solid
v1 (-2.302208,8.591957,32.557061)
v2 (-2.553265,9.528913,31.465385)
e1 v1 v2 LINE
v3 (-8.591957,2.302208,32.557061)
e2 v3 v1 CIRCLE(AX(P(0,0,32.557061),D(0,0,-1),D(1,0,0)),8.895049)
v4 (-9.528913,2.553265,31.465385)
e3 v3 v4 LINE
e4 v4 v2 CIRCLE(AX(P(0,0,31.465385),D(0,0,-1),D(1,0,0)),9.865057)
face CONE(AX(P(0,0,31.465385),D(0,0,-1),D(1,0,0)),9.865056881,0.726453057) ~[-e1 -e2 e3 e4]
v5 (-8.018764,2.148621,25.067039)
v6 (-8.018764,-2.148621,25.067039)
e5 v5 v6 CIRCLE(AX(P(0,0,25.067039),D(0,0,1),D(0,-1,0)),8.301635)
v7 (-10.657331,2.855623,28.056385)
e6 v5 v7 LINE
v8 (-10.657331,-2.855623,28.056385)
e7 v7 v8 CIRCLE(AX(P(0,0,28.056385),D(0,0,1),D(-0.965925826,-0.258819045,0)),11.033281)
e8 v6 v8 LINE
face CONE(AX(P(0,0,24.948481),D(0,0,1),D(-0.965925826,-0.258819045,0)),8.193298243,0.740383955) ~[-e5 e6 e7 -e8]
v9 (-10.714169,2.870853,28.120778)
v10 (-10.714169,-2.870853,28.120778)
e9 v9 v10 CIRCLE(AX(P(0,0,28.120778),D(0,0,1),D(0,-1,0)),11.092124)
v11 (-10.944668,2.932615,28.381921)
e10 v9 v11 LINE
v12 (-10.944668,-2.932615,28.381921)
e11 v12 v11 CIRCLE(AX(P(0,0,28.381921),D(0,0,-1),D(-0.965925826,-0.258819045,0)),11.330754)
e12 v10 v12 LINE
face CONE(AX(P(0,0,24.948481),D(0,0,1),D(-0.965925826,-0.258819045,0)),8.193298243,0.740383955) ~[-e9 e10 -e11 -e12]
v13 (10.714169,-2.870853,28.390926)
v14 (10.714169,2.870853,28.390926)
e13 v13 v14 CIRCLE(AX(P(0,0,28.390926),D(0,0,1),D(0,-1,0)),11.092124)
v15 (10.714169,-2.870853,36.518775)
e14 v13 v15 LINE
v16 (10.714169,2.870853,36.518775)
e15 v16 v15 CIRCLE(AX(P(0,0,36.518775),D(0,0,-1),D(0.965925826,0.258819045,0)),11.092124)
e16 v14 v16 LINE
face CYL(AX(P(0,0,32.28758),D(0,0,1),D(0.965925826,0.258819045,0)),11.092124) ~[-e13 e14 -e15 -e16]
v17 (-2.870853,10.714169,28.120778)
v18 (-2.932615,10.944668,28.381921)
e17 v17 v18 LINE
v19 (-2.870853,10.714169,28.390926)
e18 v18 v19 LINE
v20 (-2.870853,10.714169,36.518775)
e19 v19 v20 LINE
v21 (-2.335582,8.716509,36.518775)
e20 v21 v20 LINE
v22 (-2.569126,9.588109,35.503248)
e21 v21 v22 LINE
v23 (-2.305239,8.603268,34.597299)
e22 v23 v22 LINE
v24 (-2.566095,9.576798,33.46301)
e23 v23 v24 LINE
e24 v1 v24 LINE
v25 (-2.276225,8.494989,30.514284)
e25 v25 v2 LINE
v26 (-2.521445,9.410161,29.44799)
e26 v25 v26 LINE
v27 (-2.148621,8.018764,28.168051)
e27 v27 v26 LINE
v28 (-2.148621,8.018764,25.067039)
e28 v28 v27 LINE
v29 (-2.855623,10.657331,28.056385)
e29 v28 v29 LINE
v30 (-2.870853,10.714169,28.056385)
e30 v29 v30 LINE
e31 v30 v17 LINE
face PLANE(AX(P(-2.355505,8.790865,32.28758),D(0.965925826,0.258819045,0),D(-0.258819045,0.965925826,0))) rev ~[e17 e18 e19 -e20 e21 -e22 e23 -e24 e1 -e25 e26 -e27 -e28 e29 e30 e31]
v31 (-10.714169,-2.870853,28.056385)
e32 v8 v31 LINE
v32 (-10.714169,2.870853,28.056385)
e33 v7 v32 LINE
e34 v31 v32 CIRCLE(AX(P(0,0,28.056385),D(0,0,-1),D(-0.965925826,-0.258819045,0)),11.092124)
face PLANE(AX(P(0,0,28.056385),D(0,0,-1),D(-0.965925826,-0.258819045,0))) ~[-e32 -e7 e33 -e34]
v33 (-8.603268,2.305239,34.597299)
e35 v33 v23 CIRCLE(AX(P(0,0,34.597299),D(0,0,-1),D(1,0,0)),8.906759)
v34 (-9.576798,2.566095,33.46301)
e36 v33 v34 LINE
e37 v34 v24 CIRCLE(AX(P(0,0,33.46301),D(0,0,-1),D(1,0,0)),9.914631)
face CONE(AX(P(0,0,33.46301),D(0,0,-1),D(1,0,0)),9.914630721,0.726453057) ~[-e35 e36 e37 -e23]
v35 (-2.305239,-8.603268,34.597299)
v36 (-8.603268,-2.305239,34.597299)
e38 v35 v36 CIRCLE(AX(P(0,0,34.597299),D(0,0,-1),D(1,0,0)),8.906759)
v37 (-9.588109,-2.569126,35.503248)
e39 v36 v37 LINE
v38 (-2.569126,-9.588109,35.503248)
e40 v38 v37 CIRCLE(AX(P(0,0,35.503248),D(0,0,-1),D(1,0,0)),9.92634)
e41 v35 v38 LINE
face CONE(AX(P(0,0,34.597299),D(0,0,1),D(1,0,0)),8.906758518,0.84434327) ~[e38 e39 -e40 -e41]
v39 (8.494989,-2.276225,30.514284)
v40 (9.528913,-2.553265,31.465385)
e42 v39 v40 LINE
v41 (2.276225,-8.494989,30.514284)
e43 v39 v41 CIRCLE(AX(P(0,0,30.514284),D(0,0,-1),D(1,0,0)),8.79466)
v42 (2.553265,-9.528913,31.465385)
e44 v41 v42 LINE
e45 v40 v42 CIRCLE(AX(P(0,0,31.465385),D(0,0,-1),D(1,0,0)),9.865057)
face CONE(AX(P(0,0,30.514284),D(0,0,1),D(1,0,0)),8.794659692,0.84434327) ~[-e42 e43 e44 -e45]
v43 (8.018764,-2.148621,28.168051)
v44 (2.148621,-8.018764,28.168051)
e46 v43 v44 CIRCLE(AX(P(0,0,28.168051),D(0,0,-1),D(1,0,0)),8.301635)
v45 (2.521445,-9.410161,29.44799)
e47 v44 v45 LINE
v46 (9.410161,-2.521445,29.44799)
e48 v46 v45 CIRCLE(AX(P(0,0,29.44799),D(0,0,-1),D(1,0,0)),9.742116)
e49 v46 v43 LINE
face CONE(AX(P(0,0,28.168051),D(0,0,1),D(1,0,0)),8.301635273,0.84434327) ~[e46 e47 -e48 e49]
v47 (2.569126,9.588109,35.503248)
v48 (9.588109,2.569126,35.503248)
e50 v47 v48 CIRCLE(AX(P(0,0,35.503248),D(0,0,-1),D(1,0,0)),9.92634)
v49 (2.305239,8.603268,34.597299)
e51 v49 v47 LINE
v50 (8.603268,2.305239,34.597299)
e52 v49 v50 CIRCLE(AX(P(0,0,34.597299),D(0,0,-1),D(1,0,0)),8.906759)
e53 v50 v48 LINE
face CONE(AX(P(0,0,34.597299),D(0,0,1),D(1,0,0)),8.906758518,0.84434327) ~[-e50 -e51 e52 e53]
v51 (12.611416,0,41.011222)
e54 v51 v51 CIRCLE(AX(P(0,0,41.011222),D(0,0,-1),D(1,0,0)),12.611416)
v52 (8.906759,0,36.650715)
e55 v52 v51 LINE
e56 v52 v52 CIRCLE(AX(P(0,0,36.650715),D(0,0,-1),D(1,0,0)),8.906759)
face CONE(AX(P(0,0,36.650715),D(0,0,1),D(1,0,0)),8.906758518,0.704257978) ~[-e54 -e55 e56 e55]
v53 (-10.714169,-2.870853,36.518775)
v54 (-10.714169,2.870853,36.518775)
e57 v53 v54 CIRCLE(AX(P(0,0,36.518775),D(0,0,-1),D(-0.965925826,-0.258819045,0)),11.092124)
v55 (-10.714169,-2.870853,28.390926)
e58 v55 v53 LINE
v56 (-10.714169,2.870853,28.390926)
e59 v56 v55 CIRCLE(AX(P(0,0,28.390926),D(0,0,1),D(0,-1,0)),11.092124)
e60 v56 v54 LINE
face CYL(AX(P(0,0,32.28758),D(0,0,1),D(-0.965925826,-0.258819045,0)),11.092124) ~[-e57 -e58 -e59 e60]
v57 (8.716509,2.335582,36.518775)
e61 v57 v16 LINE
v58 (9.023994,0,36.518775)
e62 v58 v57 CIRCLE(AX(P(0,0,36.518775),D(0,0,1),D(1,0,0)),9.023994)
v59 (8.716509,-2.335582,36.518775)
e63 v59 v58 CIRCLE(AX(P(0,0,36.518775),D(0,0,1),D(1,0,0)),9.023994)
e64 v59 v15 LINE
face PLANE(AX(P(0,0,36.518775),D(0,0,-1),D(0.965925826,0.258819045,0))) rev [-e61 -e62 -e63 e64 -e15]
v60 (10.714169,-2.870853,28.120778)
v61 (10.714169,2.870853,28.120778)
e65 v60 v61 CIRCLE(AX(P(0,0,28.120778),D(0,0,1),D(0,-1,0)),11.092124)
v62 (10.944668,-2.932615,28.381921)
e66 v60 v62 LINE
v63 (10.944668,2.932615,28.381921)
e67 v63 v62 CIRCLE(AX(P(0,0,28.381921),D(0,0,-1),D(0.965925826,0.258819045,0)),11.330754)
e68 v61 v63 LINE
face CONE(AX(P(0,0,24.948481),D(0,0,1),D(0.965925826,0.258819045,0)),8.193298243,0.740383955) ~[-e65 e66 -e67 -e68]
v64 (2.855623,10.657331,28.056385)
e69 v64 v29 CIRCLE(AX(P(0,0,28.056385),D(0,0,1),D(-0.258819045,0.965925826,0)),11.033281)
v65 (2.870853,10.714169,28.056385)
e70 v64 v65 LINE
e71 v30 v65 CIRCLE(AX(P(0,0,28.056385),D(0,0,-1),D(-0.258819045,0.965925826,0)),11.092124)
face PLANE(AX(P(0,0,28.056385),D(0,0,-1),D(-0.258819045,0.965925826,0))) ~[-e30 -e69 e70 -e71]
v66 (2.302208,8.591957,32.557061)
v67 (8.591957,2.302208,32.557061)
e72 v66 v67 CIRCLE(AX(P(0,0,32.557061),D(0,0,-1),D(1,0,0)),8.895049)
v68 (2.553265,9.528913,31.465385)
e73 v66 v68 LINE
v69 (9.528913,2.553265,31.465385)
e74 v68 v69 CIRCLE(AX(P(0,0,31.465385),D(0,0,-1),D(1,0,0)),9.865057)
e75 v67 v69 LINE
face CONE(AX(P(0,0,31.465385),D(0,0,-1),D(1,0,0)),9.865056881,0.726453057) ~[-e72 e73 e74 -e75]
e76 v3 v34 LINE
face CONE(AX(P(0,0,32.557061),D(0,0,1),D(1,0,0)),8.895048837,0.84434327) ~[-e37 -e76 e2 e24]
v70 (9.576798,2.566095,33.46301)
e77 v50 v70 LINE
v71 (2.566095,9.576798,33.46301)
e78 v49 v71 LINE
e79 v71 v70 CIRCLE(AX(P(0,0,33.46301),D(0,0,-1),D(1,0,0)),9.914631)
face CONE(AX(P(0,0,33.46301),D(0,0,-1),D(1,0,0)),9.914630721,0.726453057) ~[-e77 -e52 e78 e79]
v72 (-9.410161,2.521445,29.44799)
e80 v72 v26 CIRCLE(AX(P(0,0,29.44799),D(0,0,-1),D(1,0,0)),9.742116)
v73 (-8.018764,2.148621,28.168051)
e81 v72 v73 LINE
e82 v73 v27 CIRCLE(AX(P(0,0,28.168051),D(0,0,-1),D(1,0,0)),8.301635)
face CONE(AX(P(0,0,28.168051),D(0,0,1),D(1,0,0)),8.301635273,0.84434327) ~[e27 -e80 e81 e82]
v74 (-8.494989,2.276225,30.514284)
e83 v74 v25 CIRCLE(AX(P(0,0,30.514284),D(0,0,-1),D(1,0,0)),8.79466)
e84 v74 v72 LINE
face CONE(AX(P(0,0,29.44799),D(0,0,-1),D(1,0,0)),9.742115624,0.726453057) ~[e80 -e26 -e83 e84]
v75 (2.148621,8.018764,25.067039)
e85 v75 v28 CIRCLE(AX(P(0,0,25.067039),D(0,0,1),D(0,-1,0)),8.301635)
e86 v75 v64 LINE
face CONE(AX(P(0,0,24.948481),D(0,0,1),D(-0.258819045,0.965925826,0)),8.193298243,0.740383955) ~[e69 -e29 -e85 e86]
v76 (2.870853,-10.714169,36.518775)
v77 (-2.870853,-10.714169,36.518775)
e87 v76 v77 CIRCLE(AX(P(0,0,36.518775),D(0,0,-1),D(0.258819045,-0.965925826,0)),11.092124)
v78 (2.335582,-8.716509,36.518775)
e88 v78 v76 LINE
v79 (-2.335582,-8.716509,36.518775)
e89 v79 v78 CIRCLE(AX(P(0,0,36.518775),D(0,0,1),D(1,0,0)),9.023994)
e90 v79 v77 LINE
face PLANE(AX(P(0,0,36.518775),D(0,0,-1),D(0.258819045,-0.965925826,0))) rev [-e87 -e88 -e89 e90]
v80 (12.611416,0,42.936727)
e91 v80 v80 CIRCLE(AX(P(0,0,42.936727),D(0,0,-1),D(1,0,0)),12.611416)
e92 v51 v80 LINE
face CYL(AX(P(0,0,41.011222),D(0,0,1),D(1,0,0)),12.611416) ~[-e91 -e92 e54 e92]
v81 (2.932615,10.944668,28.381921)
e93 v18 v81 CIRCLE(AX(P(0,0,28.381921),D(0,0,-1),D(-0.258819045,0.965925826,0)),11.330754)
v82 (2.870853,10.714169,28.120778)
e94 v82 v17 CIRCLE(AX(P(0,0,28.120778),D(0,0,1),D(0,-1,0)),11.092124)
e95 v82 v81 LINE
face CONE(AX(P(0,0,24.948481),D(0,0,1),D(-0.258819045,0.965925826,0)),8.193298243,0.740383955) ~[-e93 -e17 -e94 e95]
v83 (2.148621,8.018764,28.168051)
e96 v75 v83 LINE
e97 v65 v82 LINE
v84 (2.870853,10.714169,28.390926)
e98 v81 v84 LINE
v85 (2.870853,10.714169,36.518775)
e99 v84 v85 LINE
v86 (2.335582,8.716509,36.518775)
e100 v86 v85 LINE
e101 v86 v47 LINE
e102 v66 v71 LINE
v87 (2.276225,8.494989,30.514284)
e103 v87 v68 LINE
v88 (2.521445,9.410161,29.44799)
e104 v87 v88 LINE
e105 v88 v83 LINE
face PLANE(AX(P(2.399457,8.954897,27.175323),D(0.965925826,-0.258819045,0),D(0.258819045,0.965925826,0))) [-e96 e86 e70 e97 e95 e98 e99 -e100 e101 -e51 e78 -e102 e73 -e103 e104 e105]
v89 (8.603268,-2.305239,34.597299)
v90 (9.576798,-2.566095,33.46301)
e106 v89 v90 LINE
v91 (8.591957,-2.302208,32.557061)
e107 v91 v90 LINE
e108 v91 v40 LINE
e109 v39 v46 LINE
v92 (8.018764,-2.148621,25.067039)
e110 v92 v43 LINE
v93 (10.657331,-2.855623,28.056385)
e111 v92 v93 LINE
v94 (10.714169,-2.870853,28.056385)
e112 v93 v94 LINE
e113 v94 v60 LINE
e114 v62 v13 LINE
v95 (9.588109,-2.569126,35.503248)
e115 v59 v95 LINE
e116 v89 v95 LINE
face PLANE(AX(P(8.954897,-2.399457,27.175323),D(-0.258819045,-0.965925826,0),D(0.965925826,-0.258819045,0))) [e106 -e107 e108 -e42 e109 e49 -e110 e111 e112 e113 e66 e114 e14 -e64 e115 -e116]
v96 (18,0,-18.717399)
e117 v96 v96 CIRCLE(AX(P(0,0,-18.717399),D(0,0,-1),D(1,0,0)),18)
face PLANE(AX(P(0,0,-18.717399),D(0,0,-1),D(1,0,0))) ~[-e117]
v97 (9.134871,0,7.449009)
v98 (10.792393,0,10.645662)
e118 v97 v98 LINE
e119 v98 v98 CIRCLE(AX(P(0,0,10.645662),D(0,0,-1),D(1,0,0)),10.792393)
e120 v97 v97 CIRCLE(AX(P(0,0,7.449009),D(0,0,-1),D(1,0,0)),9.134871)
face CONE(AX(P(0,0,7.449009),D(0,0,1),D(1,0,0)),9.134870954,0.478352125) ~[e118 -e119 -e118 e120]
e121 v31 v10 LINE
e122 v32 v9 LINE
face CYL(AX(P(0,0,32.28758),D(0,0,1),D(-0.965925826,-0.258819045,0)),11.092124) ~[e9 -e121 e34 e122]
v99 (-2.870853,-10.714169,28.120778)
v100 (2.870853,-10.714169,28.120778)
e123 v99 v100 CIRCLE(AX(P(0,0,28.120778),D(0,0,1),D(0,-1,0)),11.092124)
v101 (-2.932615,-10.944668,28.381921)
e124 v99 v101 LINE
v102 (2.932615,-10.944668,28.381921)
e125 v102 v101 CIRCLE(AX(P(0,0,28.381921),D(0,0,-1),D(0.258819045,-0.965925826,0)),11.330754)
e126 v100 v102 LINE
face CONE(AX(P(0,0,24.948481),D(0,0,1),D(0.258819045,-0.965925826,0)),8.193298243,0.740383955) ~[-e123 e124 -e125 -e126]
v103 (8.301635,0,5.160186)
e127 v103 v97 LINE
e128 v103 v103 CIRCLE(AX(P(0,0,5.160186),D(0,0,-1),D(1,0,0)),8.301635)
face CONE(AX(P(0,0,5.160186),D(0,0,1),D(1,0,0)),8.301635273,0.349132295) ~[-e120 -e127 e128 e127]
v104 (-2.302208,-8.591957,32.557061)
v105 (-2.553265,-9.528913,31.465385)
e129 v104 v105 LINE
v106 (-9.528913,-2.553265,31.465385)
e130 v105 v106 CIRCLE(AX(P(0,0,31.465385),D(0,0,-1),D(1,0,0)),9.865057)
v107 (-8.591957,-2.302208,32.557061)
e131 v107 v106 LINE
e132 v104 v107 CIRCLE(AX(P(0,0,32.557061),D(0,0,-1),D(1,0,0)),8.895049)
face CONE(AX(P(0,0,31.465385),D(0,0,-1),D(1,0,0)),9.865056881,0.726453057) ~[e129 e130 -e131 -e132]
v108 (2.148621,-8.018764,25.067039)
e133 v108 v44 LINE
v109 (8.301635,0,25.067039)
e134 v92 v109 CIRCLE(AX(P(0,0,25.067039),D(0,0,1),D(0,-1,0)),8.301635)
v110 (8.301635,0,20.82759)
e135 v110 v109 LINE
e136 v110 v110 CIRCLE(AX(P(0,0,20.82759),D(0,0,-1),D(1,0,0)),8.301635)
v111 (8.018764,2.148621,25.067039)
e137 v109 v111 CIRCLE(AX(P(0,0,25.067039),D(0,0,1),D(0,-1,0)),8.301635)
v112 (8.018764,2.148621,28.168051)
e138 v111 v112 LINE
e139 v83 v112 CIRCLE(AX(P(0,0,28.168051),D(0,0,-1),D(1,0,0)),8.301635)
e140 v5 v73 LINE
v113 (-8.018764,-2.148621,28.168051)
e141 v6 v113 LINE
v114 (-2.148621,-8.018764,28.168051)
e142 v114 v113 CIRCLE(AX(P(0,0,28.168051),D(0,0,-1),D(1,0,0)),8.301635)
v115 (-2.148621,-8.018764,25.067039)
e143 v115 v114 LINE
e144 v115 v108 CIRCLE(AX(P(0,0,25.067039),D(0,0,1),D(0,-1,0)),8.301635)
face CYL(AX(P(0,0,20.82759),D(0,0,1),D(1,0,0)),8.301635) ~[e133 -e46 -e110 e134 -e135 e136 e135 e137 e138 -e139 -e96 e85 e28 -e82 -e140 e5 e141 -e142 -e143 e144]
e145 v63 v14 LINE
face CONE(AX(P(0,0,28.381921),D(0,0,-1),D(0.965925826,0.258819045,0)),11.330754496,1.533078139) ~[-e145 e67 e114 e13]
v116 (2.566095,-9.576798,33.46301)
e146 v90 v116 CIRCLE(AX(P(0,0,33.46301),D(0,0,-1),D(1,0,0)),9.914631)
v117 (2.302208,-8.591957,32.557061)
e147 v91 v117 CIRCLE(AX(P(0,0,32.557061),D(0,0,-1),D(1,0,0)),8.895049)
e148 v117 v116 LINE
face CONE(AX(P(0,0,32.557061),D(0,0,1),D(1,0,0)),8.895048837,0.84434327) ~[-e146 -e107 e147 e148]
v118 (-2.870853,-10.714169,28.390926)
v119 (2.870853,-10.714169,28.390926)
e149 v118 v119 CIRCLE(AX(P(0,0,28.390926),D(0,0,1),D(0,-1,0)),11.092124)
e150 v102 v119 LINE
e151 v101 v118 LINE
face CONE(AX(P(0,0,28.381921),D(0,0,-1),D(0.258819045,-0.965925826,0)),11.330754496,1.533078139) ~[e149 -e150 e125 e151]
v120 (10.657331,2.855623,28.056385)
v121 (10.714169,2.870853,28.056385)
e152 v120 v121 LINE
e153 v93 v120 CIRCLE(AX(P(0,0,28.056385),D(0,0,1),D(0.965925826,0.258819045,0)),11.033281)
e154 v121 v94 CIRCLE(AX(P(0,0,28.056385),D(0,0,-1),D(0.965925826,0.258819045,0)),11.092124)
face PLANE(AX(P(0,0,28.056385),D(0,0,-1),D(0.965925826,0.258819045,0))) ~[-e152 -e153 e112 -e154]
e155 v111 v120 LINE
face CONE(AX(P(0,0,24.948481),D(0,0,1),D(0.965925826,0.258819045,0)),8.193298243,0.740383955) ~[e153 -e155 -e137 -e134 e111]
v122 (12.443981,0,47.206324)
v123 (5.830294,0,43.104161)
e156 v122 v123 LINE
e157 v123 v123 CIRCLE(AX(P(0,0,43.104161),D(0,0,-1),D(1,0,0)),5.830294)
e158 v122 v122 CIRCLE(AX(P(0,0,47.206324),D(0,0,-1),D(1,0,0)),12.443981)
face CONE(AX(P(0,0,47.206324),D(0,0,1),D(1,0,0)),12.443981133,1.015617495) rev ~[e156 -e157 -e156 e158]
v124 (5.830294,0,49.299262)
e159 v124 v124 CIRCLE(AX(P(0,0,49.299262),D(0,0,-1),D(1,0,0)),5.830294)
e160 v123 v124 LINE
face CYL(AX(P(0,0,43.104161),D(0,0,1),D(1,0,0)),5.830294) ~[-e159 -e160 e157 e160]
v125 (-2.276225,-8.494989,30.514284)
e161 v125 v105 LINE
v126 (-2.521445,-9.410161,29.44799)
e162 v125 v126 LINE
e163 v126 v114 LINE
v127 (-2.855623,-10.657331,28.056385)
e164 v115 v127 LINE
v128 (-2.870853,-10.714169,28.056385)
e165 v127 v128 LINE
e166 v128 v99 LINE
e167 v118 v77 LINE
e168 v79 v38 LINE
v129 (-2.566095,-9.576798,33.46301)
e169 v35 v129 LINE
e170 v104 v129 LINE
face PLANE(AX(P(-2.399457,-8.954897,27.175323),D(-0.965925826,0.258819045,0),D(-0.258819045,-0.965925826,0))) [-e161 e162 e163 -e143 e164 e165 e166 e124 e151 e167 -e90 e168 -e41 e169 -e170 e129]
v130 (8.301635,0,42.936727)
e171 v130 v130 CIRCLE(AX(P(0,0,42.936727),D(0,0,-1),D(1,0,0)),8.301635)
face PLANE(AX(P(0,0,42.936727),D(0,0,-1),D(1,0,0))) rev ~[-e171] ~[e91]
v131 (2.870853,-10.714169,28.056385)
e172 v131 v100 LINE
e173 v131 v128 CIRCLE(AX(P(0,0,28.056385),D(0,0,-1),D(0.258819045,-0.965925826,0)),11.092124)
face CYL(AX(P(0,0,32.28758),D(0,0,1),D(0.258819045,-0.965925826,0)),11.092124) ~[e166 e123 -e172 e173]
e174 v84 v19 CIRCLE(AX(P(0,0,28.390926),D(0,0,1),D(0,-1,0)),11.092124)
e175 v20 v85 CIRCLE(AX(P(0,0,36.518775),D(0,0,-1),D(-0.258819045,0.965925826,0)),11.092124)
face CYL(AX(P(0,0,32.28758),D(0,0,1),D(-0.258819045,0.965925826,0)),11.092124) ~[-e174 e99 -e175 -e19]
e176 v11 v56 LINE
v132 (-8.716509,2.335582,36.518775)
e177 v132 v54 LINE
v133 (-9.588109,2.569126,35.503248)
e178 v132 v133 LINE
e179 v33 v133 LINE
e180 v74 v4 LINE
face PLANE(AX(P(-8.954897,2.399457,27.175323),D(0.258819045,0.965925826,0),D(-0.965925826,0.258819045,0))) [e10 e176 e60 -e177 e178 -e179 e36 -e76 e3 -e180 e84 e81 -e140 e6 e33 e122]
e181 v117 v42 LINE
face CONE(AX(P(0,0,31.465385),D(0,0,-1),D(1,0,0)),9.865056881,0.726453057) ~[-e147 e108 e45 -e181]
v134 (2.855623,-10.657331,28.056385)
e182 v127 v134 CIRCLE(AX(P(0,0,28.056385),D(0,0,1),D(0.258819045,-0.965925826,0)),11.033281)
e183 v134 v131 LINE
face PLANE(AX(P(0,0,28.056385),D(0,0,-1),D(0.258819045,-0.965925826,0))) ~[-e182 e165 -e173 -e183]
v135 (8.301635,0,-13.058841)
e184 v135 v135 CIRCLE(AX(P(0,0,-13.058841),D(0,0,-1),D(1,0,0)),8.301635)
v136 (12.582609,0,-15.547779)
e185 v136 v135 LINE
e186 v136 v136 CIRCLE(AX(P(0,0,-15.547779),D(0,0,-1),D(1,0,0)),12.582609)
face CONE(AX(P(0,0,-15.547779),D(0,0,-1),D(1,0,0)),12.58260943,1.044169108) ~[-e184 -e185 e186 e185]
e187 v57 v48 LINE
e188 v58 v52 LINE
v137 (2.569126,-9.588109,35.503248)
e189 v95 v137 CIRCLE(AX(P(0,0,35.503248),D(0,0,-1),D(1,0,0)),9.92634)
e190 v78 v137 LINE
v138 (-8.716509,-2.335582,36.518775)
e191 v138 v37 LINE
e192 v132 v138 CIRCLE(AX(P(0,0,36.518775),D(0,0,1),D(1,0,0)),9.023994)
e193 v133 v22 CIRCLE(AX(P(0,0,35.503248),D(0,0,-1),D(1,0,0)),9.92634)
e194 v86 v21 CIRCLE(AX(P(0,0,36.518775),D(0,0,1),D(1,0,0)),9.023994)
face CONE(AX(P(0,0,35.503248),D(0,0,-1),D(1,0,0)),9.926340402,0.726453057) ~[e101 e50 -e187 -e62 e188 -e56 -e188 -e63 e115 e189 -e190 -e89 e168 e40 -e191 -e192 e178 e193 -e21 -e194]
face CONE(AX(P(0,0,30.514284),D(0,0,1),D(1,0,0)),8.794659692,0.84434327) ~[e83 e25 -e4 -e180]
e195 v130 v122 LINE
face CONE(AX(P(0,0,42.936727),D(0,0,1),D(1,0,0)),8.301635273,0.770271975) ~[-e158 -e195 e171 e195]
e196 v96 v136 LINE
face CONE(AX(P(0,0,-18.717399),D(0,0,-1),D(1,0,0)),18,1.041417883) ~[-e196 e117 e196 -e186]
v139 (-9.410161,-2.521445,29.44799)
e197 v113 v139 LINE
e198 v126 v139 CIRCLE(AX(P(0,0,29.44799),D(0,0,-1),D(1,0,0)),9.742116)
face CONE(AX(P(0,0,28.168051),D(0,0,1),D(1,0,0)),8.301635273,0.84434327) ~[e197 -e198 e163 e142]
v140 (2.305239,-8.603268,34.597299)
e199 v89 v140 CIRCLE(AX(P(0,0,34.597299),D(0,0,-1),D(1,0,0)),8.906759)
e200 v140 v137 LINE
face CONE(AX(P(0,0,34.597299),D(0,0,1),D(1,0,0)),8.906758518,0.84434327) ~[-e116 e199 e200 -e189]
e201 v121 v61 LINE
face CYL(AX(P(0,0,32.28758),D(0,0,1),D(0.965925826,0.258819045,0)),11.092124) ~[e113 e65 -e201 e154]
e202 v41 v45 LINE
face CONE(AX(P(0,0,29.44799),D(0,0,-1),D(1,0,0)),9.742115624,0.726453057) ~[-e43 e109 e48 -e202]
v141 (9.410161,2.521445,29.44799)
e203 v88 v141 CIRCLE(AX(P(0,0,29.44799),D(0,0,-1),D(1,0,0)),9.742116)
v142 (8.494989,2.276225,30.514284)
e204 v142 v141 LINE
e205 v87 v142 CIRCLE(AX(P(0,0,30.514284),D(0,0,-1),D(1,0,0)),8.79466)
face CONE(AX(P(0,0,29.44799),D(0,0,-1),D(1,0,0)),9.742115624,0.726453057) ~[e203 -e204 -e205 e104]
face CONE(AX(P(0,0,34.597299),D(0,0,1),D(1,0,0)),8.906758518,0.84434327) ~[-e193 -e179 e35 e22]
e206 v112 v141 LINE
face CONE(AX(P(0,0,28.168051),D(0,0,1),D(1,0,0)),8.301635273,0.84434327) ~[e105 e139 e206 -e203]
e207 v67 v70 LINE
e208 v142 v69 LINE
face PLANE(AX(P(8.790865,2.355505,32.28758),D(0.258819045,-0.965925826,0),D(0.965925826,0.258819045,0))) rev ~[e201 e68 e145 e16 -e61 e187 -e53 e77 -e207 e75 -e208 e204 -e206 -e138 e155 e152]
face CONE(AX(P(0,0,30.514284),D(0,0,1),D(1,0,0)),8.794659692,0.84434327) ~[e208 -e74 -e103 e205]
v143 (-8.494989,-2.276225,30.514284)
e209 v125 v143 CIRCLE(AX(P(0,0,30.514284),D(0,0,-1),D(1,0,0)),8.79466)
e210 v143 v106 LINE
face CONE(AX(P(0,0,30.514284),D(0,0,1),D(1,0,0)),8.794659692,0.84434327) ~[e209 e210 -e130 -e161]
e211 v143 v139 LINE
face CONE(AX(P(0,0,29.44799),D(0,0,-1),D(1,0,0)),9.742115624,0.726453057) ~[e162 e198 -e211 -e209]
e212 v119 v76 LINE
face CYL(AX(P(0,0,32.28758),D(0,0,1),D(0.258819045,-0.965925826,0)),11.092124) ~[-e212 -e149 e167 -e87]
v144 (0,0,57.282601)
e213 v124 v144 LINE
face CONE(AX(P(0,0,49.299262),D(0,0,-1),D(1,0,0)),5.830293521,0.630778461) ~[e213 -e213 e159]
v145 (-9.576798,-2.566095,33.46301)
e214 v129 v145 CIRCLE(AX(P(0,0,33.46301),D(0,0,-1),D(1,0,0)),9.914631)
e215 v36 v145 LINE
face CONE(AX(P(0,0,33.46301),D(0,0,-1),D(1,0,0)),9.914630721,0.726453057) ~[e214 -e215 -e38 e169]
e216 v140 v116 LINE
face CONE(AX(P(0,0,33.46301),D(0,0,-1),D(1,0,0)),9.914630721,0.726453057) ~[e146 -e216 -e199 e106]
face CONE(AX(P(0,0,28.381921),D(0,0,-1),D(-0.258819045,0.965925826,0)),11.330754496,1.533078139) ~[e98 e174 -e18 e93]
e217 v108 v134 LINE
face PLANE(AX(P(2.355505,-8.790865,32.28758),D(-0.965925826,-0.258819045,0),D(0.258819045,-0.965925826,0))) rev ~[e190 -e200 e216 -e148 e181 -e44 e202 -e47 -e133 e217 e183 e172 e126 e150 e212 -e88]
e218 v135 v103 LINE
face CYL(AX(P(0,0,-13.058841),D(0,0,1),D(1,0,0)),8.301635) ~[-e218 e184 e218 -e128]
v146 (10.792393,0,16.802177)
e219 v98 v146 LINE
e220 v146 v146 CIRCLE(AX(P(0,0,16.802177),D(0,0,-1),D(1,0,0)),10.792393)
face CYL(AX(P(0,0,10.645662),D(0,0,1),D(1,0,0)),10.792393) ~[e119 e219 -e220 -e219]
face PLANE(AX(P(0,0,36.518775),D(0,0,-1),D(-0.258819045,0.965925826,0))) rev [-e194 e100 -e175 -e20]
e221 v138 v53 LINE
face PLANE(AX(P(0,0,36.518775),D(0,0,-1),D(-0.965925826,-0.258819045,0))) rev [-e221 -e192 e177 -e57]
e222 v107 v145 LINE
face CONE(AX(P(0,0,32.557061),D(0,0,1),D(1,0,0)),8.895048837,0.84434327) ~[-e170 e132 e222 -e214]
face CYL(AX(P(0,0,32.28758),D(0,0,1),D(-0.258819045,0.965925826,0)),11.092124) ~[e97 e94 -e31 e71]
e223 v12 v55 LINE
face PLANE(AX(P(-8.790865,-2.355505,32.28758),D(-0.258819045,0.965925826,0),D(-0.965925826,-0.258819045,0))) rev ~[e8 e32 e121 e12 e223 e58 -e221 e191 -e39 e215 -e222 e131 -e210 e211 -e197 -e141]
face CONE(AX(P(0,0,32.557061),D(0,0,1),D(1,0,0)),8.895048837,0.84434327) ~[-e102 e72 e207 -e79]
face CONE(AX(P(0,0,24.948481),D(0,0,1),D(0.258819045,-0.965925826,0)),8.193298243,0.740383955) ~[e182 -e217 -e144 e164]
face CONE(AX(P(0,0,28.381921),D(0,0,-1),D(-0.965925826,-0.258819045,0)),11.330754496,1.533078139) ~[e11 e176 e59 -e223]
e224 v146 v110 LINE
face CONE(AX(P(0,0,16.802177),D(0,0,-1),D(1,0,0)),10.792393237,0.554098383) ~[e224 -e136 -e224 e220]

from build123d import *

# Parameters (mm, degrees)
F1_W            = 3.9823013358
F1_H            = 8.4623899311
F3_ANGLE_BACK   = 15
F3_ANGLE        = 30
F3_COPIES_COUNT = 4
F5_ANGLE_BACK   = 15
F5_ANGLE        = 30
F5_COPIES_COUNT = 4


# Not quite as in the source:
# - a pattern or mirror of a feature is missing from the dataset's text; its kind, count and spacing are read off the source's solid


with BuildPart() as f2:
    # F0 (on Front) → F2 (revolve)
    with BuildSketch(Plane.XZ):
        Polygon((0, 57.2826008411), (0, -18.7173991589), (18, -18.7173991589), (12.58260943, -15.5477793887), (8.3016352728, -13.0588412285), (8.3016352728, -4.7955662012), (8.3016352728, 1.6756732948), (8.3016352728, 5.1601859741), (9.1348709539, 7.4490089901), (10.7923932374, 10.6456615031), (10.7923932374, 16.8021768332), (8.3016352728, 20.8275895566), (8.3016352728, 28.1680505723), (9.7421156242, 29.4479895383), (8.7946596922, 30.5142838619), (9.8650568815, 31.4653853958), (8.8950488368, 32.5570605196), (9.914630721, 33.4630101088), (8.9067585183, 34.5972986517), (9.9263404025, 35.5032482409), (8.9067585183, 36.6507151981), (12.6114161685, 41.0112217069), (12.6114161685, 42.9367274046), (8.3016352728, 42.9367274046), (12.4439811334, 47.2063235939), (5.8302935213, 43.1041605771), (5.8302935213, 49.299262464), align=None)
    revolve(axis=Axis((0, 0, 19.2826008411), (0, 0, -1)))

    # F1 (on Front) → F3 (revolve)
    with BuildSketch(Plane.XZ, mode=Mode.PRIVATE) as f3_sk:
        with Locations((9.1009729076, 32.2875799611)):
            Rectangle(F1_W, F1_H)
    f3 = revolve(f3_sk.sketch.rotate(Axis((0, 0, 30.8512914926), (0, 0, -1)), -F3_ANGLE_BACK), axis=Axis((0, 0, 30.8512914926), (0, 0, -1)), revolution_arc=F3_ANGLE)

    # F3_copies: F3 ×4 about axis
    f3_copies_axis = Axis((0, 0, 0), (0, 0, 1))
    for i in range(1, F3_COPIES_COUNT):
        add(f3.rotate(f3_copies_axis, i * 360 / F3_COPIES_COUNT))

    # F4 (on Front) → F5 (revolve)
    with BuildSketch(Plane.XZ, mode=Mode.PRIVATE) as f5_sk:
        Polygon((8.193298243, 24.9484814703), (11.3307544962, 28.381921351), (8.193298243, 28.5003166646), align=None)
    f5 = revolve(f5_sk.sketch.rotate(Axis((0, 0, 30.8512914926), (0, 0, -1)), -F5_ANGLE_BACK), axis=Axis((0, 0, 30.8512914926), (0, 0, -1)), revolution_arc=F5_ANGLE)

    # F5_copies: F5 ×4 about axis
    f5_copies_axis = Axis((0, 0, 0), (0, 0, 1))
    for i in range(1, F5_COPIES_COUNT):
        add(f5.rotate(f5_copies_axis, i * 360 / F5_COPIES_COUNT))


solid = f2.part
